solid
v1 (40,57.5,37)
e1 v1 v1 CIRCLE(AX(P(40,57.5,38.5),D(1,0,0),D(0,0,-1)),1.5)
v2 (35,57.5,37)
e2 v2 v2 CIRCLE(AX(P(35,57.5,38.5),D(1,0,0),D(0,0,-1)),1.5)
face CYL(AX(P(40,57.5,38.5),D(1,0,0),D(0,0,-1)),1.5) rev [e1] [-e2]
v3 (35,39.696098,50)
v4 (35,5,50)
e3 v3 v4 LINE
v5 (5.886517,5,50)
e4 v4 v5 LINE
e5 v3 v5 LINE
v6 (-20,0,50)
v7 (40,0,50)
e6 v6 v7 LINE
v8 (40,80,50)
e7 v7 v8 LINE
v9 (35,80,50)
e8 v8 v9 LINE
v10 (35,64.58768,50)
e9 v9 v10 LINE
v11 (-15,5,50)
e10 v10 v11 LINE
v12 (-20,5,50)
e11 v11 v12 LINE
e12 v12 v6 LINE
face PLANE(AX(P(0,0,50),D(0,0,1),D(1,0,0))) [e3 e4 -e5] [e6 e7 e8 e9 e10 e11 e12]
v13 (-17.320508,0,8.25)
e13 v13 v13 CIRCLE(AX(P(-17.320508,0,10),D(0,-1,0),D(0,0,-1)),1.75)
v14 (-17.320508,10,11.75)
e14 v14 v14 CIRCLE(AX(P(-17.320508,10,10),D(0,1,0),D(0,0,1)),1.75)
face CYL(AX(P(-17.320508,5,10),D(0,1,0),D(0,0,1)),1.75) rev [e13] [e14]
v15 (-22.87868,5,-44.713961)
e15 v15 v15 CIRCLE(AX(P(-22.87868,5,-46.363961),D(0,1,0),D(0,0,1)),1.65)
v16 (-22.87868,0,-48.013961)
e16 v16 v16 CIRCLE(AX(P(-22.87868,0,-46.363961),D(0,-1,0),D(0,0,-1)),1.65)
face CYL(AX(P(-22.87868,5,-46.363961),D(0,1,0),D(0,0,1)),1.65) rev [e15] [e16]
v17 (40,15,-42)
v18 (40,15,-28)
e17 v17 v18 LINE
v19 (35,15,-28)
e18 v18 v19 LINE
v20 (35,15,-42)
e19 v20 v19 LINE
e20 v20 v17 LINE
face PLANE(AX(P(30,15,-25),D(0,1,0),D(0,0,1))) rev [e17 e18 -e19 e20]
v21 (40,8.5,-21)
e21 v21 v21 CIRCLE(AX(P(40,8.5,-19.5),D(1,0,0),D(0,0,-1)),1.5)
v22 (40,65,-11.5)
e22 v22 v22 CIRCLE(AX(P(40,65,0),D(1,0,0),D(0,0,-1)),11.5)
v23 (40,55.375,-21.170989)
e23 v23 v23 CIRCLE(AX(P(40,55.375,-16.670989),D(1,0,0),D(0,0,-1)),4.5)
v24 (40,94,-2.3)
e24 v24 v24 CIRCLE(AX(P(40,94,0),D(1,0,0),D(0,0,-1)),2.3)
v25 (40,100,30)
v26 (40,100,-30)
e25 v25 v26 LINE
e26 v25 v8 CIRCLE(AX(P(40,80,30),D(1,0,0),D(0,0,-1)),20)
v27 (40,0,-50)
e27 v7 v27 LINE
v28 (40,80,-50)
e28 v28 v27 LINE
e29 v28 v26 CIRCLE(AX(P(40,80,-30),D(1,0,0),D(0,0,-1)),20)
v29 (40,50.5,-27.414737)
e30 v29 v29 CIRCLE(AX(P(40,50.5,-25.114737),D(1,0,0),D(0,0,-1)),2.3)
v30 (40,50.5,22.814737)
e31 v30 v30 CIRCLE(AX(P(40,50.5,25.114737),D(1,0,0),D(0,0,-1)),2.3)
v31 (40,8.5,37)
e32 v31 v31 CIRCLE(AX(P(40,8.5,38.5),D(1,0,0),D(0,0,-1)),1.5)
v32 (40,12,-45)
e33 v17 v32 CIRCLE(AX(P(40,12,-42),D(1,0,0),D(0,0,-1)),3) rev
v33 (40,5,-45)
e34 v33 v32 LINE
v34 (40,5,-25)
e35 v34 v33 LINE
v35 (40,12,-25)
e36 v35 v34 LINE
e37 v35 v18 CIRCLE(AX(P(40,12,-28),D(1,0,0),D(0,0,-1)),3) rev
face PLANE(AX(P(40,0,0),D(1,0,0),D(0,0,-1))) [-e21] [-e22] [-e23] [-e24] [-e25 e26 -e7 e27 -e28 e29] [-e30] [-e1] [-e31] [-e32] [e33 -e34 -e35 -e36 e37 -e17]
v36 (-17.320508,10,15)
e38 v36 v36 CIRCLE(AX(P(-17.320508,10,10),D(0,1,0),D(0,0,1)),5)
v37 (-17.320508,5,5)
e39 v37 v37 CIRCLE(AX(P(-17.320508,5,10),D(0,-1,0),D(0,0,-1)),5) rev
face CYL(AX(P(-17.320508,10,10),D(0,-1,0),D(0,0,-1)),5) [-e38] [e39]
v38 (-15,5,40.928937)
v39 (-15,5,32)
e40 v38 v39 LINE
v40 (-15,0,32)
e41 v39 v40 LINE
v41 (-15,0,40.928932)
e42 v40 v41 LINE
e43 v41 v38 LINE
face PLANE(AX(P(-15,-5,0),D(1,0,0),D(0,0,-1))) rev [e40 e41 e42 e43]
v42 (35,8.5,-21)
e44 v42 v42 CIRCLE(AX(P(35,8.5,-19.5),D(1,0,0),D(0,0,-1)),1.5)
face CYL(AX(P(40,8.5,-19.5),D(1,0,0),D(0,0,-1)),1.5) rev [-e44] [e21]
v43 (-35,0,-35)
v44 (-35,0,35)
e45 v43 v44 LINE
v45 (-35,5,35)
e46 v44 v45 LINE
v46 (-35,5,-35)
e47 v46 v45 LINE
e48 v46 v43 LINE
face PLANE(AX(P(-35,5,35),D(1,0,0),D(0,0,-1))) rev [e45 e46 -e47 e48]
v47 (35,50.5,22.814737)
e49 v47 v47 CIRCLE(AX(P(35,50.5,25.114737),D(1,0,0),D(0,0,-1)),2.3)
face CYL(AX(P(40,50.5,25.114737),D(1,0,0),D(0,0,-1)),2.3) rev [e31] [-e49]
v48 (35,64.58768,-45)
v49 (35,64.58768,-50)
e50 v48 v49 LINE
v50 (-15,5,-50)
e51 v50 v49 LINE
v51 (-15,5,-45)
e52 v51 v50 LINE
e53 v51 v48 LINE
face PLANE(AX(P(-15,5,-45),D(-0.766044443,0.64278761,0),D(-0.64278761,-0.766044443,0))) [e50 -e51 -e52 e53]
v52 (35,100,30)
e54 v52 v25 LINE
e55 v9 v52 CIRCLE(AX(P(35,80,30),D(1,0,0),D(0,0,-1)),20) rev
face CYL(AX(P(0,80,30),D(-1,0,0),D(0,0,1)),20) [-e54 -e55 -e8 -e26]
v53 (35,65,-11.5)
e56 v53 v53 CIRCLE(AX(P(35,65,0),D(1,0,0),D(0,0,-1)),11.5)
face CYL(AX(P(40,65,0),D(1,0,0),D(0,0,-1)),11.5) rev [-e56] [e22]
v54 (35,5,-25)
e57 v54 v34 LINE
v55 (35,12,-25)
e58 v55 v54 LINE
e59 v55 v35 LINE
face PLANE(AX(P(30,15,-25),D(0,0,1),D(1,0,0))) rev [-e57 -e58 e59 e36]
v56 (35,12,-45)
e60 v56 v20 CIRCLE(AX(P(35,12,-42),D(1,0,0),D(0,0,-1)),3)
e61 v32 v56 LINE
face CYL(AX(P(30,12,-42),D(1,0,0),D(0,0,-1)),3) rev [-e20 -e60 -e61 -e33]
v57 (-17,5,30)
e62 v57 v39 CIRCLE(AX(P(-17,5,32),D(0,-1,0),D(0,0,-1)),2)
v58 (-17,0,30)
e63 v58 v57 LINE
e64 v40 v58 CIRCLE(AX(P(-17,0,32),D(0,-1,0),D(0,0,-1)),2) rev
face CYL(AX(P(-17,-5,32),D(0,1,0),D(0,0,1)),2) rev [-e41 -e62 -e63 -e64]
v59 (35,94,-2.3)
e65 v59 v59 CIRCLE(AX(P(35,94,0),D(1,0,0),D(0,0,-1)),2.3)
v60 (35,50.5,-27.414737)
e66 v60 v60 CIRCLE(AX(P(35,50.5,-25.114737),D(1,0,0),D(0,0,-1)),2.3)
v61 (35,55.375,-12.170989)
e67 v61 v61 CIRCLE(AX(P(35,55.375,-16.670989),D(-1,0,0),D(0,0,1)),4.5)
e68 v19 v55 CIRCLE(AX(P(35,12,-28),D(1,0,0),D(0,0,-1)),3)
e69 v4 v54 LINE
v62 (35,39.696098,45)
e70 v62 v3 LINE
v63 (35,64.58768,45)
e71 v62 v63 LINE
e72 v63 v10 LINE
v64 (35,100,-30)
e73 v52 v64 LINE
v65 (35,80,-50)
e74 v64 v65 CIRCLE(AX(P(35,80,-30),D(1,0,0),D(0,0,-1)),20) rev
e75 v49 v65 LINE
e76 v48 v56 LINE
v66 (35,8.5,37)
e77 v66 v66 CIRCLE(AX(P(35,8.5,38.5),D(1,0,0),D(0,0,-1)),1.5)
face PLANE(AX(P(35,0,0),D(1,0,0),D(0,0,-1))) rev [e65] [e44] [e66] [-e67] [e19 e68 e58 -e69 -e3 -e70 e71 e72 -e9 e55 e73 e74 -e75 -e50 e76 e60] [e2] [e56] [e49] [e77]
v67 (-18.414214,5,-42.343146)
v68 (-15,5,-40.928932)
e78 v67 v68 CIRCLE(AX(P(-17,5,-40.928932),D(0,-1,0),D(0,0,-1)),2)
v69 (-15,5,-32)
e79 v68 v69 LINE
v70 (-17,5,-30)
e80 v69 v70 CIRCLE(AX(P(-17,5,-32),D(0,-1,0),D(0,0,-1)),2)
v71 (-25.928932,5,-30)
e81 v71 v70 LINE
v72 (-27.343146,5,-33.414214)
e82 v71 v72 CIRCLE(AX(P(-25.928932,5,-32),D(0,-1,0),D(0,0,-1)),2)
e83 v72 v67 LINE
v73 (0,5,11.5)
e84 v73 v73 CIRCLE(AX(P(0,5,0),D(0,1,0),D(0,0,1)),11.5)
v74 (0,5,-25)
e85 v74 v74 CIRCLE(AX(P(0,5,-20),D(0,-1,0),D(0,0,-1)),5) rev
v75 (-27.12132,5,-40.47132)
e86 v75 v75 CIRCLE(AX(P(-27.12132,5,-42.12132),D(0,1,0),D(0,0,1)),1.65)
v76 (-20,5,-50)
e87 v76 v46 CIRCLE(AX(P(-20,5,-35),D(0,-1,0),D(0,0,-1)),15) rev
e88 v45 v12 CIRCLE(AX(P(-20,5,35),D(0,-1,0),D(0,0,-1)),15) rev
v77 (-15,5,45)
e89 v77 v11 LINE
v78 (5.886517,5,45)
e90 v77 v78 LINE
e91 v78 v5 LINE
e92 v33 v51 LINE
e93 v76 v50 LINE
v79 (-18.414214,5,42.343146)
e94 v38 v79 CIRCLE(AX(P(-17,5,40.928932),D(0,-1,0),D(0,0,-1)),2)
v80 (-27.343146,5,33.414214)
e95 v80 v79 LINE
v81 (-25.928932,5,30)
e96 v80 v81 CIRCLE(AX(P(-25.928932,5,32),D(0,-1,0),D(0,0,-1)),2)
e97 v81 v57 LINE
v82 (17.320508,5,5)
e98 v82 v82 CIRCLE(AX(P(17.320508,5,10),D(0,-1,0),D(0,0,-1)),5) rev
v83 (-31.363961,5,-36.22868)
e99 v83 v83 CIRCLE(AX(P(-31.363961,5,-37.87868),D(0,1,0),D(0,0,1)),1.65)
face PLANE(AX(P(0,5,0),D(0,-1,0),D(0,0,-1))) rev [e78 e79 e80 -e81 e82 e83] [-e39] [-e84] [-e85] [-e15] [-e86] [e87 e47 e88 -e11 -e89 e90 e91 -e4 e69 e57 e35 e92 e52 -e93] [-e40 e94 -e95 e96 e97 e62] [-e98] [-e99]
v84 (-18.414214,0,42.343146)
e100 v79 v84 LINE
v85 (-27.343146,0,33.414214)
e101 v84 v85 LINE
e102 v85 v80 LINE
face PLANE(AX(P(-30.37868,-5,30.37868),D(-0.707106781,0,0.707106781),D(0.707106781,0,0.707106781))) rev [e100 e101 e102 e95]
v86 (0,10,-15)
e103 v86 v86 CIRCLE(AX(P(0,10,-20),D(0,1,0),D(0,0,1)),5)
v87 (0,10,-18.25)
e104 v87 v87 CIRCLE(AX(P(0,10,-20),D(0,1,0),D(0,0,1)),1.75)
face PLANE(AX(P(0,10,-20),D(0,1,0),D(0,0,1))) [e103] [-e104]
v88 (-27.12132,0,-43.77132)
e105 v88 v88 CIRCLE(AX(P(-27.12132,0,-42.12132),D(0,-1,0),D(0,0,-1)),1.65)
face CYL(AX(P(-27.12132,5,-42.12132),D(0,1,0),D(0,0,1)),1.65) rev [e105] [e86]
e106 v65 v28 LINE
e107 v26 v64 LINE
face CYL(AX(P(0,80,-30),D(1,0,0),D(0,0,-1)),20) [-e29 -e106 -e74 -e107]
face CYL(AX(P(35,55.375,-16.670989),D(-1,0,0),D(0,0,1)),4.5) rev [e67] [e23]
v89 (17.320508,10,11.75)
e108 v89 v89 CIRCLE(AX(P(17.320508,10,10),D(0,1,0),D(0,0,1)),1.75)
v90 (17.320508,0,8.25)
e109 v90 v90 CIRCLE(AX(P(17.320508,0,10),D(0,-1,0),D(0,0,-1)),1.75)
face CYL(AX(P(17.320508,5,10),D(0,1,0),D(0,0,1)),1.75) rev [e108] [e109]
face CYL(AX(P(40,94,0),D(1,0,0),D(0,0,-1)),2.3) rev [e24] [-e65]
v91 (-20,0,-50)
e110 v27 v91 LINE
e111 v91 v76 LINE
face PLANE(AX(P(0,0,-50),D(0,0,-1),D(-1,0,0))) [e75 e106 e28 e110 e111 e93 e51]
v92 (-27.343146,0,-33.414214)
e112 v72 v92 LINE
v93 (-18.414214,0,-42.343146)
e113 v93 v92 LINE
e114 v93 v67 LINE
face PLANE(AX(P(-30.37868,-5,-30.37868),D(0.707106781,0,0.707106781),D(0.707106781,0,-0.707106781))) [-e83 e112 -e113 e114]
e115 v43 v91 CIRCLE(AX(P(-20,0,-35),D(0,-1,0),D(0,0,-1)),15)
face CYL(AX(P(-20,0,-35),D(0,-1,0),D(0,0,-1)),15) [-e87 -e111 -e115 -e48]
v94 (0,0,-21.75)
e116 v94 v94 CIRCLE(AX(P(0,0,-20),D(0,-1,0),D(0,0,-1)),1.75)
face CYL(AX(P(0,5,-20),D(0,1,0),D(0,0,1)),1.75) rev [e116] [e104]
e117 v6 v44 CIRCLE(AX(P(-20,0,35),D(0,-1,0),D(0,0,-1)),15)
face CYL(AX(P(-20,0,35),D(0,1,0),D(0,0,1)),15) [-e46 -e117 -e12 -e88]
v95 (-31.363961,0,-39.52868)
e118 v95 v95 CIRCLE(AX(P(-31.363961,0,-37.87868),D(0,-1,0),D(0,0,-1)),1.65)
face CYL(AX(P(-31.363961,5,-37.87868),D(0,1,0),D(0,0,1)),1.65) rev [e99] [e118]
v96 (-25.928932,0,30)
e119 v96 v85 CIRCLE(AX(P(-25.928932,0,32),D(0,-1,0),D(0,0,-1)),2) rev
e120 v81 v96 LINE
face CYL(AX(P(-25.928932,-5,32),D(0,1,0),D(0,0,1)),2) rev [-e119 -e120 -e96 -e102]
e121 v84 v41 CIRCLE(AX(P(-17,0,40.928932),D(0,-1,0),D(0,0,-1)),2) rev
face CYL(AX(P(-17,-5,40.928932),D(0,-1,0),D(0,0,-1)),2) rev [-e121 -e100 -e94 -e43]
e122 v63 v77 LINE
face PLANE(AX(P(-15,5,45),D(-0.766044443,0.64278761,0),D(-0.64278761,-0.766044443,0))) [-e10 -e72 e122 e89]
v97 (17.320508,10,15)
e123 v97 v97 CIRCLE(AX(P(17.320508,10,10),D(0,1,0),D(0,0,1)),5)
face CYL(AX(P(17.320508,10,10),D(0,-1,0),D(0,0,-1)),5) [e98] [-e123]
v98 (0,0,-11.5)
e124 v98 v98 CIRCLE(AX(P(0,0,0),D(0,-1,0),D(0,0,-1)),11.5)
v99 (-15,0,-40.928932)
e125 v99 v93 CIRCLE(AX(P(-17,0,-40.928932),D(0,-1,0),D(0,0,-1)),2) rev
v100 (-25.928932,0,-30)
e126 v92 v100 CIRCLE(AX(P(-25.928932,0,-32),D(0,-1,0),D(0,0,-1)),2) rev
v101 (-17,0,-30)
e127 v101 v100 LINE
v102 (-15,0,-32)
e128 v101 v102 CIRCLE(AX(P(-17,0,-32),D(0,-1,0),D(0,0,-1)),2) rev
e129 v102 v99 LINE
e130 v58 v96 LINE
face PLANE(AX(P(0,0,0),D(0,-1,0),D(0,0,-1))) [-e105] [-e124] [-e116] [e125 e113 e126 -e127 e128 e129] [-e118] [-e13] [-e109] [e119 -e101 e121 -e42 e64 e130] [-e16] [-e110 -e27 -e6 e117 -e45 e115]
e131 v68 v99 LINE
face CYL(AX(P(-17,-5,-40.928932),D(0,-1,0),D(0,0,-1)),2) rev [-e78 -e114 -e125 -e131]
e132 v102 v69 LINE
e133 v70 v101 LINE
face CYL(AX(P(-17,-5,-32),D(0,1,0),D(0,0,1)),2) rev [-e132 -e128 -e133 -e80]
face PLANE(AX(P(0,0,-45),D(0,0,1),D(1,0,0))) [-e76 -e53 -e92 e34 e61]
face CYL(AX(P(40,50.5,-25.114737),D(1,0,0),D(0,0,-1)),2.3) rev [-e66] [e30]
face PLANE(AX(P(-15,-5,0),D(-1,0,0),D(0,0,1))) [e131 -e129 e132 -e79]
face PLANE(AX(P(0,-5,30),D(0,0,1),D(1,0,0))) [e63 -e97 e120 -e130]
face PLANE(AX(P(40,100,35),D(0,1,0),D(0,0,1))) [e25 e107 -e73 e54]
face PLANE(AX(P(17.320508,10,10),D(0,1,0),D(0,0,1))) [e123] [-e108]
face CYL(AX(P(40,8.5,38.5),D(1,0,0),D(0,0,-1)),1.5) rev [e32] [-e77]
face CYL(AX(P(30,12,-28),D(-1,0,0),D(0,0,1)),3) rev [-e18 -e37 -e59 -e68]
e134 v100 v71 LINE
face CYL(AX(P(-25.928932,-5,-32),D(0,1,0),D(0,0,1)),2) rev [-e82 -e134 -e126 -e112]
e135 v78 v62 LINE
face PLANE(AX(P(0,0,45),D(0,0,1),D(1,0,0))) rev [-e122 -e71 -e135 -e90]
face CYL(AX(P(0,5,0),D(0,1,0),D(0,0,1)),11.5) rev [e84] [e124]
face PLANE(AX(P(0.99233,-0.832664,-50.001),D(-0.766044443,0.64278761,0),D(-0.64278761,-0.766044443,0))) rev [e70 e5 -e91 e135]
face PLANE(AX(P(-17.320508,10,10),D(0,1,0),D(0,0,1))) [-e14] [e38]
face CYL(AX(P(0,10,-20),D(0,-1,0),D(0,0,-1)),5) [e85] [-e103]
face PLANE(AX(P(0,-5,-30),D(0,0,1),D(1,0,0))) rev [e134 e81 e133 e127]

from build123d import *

# Parameters (mm, degrees)
SKETCH_1_W          = 70
SKETCH_1_H          = 70
EXTRUDE_1_DEPTH     = 5
HOLE_WIZARD_1_D     = 3.5
HOLE_WIZARD_2_D     = 23
SKETCH_7_W          = 70
SKETCH_7_H          = 100
EXTRUDE_2_DEPTH     = 5
HOLE_WIZARD_4_D     = 4.6
HOLE_WIZARD_5_D     = 23
SKETCH_16_R         = 5
SKETCH_16_R_2       = 1.75
EXTRUDE_3_DEPTH     = 5
SKETCH_17_W         = 5
SKETCH_17_H         = 60
SKETCH_17_W_2       = 35
SKETCH_17_H_2       = 5
EXTRUDE_4_DEPTH     = 15
SKETCH_18_W         = 35
SKETCH_18_H         = 5
SKETCH_18_W_2       = 5
SKETCH_18_H_2       = 60
EXTRUDE_5_DEPTH     = 15
EXTRUDE_6_DEPTH     = 5
EXTRUDE_7_DEPTH     = 5
HOLE_WIZARD_6_D     = 3
HOLE_WIZARD_6_DEPTH = 5
FILLET_2_R          = 20
HOLE_WIZARD_7_D     = 9
CUT_EXTRUDE_1_DEPTH = 10
FILLET_3_R          = 2
FILLET_4_R          = 15
SKETCH_29_W         = 20
SKETCH_29_H         = 10
CUT_EXTRUDE_2_DEPTH = 10
FILLET_5_R          = 3
HOLE_WIZARD_8_D     = 3.3
CUT_EXTRUDE_3_REACH = 148.969


with BuildPart() as part:
    # 草图1 → 凸台-拉伸1 (new body)
    with BuildSketch(Plane(origin=(0, 0, 0), x_dir=(1, 0, 0), z_dir=(0, 1, 0))):
        Rectangle(SKETCH_1_W, SKETCH_1_H)
    extrude(amount=EXTRUDE_1_DEPTH)

    # 孔1 (through all)
    with Locations(Plane(origin=(0, 5, 0), x_dir=(1, 0, 0), z_dir=(0, 1, 0))):
        with Locations((0, 20), (-17.320508076, -10), (17.320508076, -10)):
            Hole(HOLE_WIZARD_1_D / 2)

    # 孔2 (through all)
    with Locations(Plane(origin=(0, 5, 0), x_dir=(1, 0, 0), z_dir=(0, 1, 0))):
        with Locations((0, 0)):
            Hole(HOLE_WIZARD_2_D / 2)

    # 草图7 → 凸台-拉伸2 (add)
    with BuildSketch(Plane(origin=(35, 0, 0), x_dir=(0, 0, -1), z_dir=(1, 0, 0))):
        with Locations((0, 50)):
            Rectangle(SKETCH_7_W, SKETCH_7_H)
    extrude(amount=EXTRUDE_2_DEPTH)

    # 孔4 (through all)
    with Locations(Plane(origin=(40, 0, 0), x_dir=(0, 0, -1), z_dir=(1, 0, 0))):
        with Locations((0, 94), (-25.11473671, 50.5), (25.11473671, 50.5)):
            Hole(HOLE_WIZARD_4_D / 2)

    # 孔5 (through all)
    with Locations(Plane(origin=(40, 0, 0), x_dir=(0, 0, -1), z_dir=(1, 0, 0))):
        with Locations((0, 65)):
            Hole(HOLE_WIZARD_5_D / 2)

    # 草图16 → 凸台-拉伸3 (add)
    # profile 1 of 3: a face of its own
    with BuildSketch(Plane(origin=(0, 5, 0), x_dir=(1, 0, 0), z_dir=(0, 1, 0))):
        with Locations(Location((0, 20, 0), (0, 0, 90))):
            Circle(SKETCH_16_R)
        with Locations(Location((0, 20, 0), (0, 0, 270))):
            Circle(SKETCH_16_R_2, mode=Mode.SUBTRACT)
    # profile 2 of 3: a face of its own
    with BuildSketch(Plane(origin=(0, 5, 0), x_dir=(1, 0, 0), z_dir=(0, 1, 0))):
        with Locations(Location((-17.320508076, -10, 0), (0, 0, 90))):
            Circle(SKETCH_16_R)
        with Locations(Location((-17.320508076, -10, 0), (0, 0, 270))):
            Circle(SKETCH_16_R_2, mode=Mode.SUBTRACT)
    # profile 3 of 3: a face of its own
    with BuildSketch(Plane(origin=(0, 5, 0), x_dir=(1, 0, 0), z_dir=(0, 1, 0))):
        with Locations(Location((17.320508076, -10, 0), (0, 0, 90))):
            Circle(SKETCH_16_R)
        with Locations(Location((17.320508076, -10, 0), (0, 0, 270))):
            Circle(SKETCH_16_R_2, mode=Mode.SUBTRACT)
    extrude(amount=EXTRUDE_3_DEPTH)

    # 草图17 → 凸台-拉伸4 (add)
    with BuildSketch(Plane(origin=(0, 0, -35), x_dir=(-1, 0, 0), z_dir=(0, 0, -1))):
        with Locations((-37.5, 70)):
            Rectangle(SKETCH_17_W, SKETCH_17_H)
        Polygon((-35, 35), (-40, 40), (-40, 0), (0, 0), (-5, 5), (-35, 5), align=None)
        Polygon((-35, 40), (-40, 40), (-35, 35), align=None)
        with Locations((17.5, 2.5)):
            Rectangle(SKETCH_17_W_2, SKETCH_17_H_2)
        Polygon((0, 5), (-5, 5), (0, 0), align=None)
    extrude(amount=EXTRUDE_4_DEPTH)

    # 草图18 → 凸台-拉伸5 (add)
    with BuildSketch(Plane.XY.offset(35)):
        with Locations((-17.5, 2.5)):
            Rectangle(SKETCH_18_W, SKETCH_18_H)
        Polygon((0, 0), (5, 5), (0, 5), align=None)
        Polygon((40, 0), (40, 40), (35, 35), (35, 5), (5, 5), (0, 0), align=None)
        Polygon((35, 35), (40, 40), (35, 40), align=None)
        with Locations((37.5, 70)):
            Rectangle(SKETCH_18_W_2, SKETCH_18_H_2)
    extrude(amount=EXTRUDE_5_DEPTH)

    # 草图19 → 凸台-拉伸6 (add)
    with BuildSketch(Plane(origin=(0, 0, -50), x_dir=(-1, 0, 0), z_dir=(0, 0, -1))):
        Polygon((15, 5), (-35, 64.58767963), (-35, 5), align=None)
    extrude(amount=-EXTRUDE_6_DEPTH)

    # 草图20 → 凸台-拉伸7 (add)
    with BuildSketch(Plane.XY.offset(50)):
        Polygon((-15, 5), (35, 64.58767963), (35, 5), align=None)
    extrude(amount=-EXTRUDE_7_DEPTH)

    # 孔6
    with Locations(Plane(origin=(40, 0, 0), x_dir=(0, 0, -1), z_dir=(1, 0, 0))):
        with Locations((-38.5, 57.5), (-38.5, 8.5), (19.5, 8.5)):
            Hole(HOLE_WIZARD_6_D / 2, depth=HOLE_WIZARD_6_DEPTH)

    # 圆角2
    # the kernel refuses this fillet: 20 mm, written as the material it takes off along each edge
    with BuildSketch(Plane(origin=(-15, 100, -50), x_dir=(0, -1, 0), z_dir=(1, 0, 0)), Plane(origin=(90, 100, 50), x_dir=(0, -1, 0), z_dir=(-1, 0, 0))) as fillet_2_piece_1:
        with BuildLine():
            CenterArc((FILLET_2_R, -FILLET_2_R), FILLET_2_R, 90, 90)
            Line((0, -FILLET_2_R), (0, 0))
            Line((0, 0), (FILLET_2_R, 0))
        make_face()
    extrude(amount=105, mode=Mode.SUBTRACT)

    # 孔7 (through all)
    with Locations(Plane.ZY.offset(-35)):
        with Locations((-16.670989023, 55.375)):
            Hole(HOLE_WIZARD_7_D / 2)

    # 草图28 → 切除-拉伸1 (cut)
    with BuildSketch(Plane(origin=(0, 5, 0), x_dir=(1, 0, 0), z_dir=(0, 1, 0))):
        Polygon((-15, 45.757359313), (-30.757359313, 30), (-15, 30), align=None)
        Polygon((-30.757359313, -30), (-15, -45.757359313), (-15, -30), align=None)
    extrude(amount=-CUT_EXTRUDE_1_DEPTH, mode=Mode.SUBTRACT)

    # 圆角3
    # the kernel refuses this fillet: 2 mm, written as the material it adds along each edge
    with BuildSketch(Plane(origin=(-30.757359313, 5, -30), x_dir=(0.7071067811865478, 0, -0.7071067811865471), z_dir=(0, -1, 0)), Plane(origin=(-15, 5, 45.757359313), x_dir=(-0.7071067811865471, 0, -0.7071067811865479), z_dir=(0, -1, 0))) as fillet_3_piece_1:
        with BuildLine():
            CenterArc((FILLET_3_R * 2.41421356237, FILLET_3_R), FILLET_3_R, 135, 135)
            Line((FILLET_3_R * 1.70710678119, FILLET_3_R * 1.70710678119), (0, 0))
            Line((0, 0), (FILLET_3_R * 2.41421356237, 0))
        make_face()
    extrude(amount=5)
    with BuildSketch(Plane(origin=(-15, 5, -45.757359313), x_dir=(-0.7071067811865478, 0, 0.7071067811865474), z_dir=(0, -1, 0)), Plane(origin=(-30.757359313, 5, 30), x_dir=(0.7071067811865476, 0, 0.7071067811865476), z_dir=(0, -1, 0))) as fillet_3_piece_2:
        with BuildLine():
            CenterArc((FILLET_3_R * 2.41421356237, -FILLET_3_R), FILLET_3_R, 90, 135)
            Line((FILLET_3_R * 1.70710678119, -FILLET_3_R * 1.70710678119), (0, 0))
            Line((0, 0), (FILLET_3_R * 2.41421356237, 0))
        make_face()
    extrude(amount=5)
    with BuildSketch(Plane(origin=(-15, 5, -30), x_dir=(-1, 0, 0), z_dir=(0, -1, 0)), Plane(origin=(-15, 5, 30), x_dir=(0, 0, 1), z_dir=(0, -1, 0))) as fillet_3_piece_3:
        with BuildLine():
            CenterArc((FILLET_3_R, FILLET_3_R), FILLET_3_R, 180, 90)
            Line((0, FILLET_3_R), (0, 0))
            Line((0, 0), (FILLET_3_R, 0))
        make_face()
    extrude(amount=5)

    # 圆角4
    fillet_4_edges = [part.edges().sort_by_distance(p)[0] for p in [
        (-35, 2.5, -50),
        (-35, 2.5, 50),
    ]]
    fillet(fillet_4_edges, radius=FILLET_4_R)

    # 草图29 → 切除-拉伸2 (cut)
    with BuildSketch(Plane(origin=(40, 0, 0), x_dir=(0, 0, -1), z_dir=(1, 0, 0))):
        with Locations((35, 10)):
            Rectangle(SKETCH_29_W, SKETCH_29_H)
    extrude(amount=-CUT_EXTRUDE_2_DEPTH, mode=Mode.SUBTRACT)

    # 圆角5
    fillet_5_edges = [part.edges().sort_by_distance(p)[0] for p in [
        (37.5, 15, -45),
        (37.5, 15, -25),
    ]]
    fillet(fillet_5_edges, radius=FILLET_5_R)

    # 孔8 (through all)
    with Locations(Plane(origin=(0, 5, 0), x_dir=(1, 0, 0), z_dir=(0, 1, 0))):
        with Locations((-31.363961031, 37.878679656), (-27.121320344, 42.121320344), (-22.878679656, 46.363961031)):
            Hole(HOLE_WIZARD_8_D / 2)

    # 草图34 → 切除-拉伸3 (cut, up to next)
    with BuildSketch(Plane.XY.offset(50), mode=Mode.PRIVATE) as cut_extrude_3_sk1:
        Polygon((35, 5), (35, 39.6960984), (5.886516629, 5), align=None)
    cut_extrude_3_tool1 = extrude(cut_extrude_3_sk1.sketch, amount=-CUT_EXTRUDE_3_REACH, mode=Mode.PRIVATE) & part.part
    add(cut_extrude_3_tool1.solids().sort_by_distance((25.295506, 16.565366, 50))[0], mode=Mode.SUBTRACT)


solid = part.part
